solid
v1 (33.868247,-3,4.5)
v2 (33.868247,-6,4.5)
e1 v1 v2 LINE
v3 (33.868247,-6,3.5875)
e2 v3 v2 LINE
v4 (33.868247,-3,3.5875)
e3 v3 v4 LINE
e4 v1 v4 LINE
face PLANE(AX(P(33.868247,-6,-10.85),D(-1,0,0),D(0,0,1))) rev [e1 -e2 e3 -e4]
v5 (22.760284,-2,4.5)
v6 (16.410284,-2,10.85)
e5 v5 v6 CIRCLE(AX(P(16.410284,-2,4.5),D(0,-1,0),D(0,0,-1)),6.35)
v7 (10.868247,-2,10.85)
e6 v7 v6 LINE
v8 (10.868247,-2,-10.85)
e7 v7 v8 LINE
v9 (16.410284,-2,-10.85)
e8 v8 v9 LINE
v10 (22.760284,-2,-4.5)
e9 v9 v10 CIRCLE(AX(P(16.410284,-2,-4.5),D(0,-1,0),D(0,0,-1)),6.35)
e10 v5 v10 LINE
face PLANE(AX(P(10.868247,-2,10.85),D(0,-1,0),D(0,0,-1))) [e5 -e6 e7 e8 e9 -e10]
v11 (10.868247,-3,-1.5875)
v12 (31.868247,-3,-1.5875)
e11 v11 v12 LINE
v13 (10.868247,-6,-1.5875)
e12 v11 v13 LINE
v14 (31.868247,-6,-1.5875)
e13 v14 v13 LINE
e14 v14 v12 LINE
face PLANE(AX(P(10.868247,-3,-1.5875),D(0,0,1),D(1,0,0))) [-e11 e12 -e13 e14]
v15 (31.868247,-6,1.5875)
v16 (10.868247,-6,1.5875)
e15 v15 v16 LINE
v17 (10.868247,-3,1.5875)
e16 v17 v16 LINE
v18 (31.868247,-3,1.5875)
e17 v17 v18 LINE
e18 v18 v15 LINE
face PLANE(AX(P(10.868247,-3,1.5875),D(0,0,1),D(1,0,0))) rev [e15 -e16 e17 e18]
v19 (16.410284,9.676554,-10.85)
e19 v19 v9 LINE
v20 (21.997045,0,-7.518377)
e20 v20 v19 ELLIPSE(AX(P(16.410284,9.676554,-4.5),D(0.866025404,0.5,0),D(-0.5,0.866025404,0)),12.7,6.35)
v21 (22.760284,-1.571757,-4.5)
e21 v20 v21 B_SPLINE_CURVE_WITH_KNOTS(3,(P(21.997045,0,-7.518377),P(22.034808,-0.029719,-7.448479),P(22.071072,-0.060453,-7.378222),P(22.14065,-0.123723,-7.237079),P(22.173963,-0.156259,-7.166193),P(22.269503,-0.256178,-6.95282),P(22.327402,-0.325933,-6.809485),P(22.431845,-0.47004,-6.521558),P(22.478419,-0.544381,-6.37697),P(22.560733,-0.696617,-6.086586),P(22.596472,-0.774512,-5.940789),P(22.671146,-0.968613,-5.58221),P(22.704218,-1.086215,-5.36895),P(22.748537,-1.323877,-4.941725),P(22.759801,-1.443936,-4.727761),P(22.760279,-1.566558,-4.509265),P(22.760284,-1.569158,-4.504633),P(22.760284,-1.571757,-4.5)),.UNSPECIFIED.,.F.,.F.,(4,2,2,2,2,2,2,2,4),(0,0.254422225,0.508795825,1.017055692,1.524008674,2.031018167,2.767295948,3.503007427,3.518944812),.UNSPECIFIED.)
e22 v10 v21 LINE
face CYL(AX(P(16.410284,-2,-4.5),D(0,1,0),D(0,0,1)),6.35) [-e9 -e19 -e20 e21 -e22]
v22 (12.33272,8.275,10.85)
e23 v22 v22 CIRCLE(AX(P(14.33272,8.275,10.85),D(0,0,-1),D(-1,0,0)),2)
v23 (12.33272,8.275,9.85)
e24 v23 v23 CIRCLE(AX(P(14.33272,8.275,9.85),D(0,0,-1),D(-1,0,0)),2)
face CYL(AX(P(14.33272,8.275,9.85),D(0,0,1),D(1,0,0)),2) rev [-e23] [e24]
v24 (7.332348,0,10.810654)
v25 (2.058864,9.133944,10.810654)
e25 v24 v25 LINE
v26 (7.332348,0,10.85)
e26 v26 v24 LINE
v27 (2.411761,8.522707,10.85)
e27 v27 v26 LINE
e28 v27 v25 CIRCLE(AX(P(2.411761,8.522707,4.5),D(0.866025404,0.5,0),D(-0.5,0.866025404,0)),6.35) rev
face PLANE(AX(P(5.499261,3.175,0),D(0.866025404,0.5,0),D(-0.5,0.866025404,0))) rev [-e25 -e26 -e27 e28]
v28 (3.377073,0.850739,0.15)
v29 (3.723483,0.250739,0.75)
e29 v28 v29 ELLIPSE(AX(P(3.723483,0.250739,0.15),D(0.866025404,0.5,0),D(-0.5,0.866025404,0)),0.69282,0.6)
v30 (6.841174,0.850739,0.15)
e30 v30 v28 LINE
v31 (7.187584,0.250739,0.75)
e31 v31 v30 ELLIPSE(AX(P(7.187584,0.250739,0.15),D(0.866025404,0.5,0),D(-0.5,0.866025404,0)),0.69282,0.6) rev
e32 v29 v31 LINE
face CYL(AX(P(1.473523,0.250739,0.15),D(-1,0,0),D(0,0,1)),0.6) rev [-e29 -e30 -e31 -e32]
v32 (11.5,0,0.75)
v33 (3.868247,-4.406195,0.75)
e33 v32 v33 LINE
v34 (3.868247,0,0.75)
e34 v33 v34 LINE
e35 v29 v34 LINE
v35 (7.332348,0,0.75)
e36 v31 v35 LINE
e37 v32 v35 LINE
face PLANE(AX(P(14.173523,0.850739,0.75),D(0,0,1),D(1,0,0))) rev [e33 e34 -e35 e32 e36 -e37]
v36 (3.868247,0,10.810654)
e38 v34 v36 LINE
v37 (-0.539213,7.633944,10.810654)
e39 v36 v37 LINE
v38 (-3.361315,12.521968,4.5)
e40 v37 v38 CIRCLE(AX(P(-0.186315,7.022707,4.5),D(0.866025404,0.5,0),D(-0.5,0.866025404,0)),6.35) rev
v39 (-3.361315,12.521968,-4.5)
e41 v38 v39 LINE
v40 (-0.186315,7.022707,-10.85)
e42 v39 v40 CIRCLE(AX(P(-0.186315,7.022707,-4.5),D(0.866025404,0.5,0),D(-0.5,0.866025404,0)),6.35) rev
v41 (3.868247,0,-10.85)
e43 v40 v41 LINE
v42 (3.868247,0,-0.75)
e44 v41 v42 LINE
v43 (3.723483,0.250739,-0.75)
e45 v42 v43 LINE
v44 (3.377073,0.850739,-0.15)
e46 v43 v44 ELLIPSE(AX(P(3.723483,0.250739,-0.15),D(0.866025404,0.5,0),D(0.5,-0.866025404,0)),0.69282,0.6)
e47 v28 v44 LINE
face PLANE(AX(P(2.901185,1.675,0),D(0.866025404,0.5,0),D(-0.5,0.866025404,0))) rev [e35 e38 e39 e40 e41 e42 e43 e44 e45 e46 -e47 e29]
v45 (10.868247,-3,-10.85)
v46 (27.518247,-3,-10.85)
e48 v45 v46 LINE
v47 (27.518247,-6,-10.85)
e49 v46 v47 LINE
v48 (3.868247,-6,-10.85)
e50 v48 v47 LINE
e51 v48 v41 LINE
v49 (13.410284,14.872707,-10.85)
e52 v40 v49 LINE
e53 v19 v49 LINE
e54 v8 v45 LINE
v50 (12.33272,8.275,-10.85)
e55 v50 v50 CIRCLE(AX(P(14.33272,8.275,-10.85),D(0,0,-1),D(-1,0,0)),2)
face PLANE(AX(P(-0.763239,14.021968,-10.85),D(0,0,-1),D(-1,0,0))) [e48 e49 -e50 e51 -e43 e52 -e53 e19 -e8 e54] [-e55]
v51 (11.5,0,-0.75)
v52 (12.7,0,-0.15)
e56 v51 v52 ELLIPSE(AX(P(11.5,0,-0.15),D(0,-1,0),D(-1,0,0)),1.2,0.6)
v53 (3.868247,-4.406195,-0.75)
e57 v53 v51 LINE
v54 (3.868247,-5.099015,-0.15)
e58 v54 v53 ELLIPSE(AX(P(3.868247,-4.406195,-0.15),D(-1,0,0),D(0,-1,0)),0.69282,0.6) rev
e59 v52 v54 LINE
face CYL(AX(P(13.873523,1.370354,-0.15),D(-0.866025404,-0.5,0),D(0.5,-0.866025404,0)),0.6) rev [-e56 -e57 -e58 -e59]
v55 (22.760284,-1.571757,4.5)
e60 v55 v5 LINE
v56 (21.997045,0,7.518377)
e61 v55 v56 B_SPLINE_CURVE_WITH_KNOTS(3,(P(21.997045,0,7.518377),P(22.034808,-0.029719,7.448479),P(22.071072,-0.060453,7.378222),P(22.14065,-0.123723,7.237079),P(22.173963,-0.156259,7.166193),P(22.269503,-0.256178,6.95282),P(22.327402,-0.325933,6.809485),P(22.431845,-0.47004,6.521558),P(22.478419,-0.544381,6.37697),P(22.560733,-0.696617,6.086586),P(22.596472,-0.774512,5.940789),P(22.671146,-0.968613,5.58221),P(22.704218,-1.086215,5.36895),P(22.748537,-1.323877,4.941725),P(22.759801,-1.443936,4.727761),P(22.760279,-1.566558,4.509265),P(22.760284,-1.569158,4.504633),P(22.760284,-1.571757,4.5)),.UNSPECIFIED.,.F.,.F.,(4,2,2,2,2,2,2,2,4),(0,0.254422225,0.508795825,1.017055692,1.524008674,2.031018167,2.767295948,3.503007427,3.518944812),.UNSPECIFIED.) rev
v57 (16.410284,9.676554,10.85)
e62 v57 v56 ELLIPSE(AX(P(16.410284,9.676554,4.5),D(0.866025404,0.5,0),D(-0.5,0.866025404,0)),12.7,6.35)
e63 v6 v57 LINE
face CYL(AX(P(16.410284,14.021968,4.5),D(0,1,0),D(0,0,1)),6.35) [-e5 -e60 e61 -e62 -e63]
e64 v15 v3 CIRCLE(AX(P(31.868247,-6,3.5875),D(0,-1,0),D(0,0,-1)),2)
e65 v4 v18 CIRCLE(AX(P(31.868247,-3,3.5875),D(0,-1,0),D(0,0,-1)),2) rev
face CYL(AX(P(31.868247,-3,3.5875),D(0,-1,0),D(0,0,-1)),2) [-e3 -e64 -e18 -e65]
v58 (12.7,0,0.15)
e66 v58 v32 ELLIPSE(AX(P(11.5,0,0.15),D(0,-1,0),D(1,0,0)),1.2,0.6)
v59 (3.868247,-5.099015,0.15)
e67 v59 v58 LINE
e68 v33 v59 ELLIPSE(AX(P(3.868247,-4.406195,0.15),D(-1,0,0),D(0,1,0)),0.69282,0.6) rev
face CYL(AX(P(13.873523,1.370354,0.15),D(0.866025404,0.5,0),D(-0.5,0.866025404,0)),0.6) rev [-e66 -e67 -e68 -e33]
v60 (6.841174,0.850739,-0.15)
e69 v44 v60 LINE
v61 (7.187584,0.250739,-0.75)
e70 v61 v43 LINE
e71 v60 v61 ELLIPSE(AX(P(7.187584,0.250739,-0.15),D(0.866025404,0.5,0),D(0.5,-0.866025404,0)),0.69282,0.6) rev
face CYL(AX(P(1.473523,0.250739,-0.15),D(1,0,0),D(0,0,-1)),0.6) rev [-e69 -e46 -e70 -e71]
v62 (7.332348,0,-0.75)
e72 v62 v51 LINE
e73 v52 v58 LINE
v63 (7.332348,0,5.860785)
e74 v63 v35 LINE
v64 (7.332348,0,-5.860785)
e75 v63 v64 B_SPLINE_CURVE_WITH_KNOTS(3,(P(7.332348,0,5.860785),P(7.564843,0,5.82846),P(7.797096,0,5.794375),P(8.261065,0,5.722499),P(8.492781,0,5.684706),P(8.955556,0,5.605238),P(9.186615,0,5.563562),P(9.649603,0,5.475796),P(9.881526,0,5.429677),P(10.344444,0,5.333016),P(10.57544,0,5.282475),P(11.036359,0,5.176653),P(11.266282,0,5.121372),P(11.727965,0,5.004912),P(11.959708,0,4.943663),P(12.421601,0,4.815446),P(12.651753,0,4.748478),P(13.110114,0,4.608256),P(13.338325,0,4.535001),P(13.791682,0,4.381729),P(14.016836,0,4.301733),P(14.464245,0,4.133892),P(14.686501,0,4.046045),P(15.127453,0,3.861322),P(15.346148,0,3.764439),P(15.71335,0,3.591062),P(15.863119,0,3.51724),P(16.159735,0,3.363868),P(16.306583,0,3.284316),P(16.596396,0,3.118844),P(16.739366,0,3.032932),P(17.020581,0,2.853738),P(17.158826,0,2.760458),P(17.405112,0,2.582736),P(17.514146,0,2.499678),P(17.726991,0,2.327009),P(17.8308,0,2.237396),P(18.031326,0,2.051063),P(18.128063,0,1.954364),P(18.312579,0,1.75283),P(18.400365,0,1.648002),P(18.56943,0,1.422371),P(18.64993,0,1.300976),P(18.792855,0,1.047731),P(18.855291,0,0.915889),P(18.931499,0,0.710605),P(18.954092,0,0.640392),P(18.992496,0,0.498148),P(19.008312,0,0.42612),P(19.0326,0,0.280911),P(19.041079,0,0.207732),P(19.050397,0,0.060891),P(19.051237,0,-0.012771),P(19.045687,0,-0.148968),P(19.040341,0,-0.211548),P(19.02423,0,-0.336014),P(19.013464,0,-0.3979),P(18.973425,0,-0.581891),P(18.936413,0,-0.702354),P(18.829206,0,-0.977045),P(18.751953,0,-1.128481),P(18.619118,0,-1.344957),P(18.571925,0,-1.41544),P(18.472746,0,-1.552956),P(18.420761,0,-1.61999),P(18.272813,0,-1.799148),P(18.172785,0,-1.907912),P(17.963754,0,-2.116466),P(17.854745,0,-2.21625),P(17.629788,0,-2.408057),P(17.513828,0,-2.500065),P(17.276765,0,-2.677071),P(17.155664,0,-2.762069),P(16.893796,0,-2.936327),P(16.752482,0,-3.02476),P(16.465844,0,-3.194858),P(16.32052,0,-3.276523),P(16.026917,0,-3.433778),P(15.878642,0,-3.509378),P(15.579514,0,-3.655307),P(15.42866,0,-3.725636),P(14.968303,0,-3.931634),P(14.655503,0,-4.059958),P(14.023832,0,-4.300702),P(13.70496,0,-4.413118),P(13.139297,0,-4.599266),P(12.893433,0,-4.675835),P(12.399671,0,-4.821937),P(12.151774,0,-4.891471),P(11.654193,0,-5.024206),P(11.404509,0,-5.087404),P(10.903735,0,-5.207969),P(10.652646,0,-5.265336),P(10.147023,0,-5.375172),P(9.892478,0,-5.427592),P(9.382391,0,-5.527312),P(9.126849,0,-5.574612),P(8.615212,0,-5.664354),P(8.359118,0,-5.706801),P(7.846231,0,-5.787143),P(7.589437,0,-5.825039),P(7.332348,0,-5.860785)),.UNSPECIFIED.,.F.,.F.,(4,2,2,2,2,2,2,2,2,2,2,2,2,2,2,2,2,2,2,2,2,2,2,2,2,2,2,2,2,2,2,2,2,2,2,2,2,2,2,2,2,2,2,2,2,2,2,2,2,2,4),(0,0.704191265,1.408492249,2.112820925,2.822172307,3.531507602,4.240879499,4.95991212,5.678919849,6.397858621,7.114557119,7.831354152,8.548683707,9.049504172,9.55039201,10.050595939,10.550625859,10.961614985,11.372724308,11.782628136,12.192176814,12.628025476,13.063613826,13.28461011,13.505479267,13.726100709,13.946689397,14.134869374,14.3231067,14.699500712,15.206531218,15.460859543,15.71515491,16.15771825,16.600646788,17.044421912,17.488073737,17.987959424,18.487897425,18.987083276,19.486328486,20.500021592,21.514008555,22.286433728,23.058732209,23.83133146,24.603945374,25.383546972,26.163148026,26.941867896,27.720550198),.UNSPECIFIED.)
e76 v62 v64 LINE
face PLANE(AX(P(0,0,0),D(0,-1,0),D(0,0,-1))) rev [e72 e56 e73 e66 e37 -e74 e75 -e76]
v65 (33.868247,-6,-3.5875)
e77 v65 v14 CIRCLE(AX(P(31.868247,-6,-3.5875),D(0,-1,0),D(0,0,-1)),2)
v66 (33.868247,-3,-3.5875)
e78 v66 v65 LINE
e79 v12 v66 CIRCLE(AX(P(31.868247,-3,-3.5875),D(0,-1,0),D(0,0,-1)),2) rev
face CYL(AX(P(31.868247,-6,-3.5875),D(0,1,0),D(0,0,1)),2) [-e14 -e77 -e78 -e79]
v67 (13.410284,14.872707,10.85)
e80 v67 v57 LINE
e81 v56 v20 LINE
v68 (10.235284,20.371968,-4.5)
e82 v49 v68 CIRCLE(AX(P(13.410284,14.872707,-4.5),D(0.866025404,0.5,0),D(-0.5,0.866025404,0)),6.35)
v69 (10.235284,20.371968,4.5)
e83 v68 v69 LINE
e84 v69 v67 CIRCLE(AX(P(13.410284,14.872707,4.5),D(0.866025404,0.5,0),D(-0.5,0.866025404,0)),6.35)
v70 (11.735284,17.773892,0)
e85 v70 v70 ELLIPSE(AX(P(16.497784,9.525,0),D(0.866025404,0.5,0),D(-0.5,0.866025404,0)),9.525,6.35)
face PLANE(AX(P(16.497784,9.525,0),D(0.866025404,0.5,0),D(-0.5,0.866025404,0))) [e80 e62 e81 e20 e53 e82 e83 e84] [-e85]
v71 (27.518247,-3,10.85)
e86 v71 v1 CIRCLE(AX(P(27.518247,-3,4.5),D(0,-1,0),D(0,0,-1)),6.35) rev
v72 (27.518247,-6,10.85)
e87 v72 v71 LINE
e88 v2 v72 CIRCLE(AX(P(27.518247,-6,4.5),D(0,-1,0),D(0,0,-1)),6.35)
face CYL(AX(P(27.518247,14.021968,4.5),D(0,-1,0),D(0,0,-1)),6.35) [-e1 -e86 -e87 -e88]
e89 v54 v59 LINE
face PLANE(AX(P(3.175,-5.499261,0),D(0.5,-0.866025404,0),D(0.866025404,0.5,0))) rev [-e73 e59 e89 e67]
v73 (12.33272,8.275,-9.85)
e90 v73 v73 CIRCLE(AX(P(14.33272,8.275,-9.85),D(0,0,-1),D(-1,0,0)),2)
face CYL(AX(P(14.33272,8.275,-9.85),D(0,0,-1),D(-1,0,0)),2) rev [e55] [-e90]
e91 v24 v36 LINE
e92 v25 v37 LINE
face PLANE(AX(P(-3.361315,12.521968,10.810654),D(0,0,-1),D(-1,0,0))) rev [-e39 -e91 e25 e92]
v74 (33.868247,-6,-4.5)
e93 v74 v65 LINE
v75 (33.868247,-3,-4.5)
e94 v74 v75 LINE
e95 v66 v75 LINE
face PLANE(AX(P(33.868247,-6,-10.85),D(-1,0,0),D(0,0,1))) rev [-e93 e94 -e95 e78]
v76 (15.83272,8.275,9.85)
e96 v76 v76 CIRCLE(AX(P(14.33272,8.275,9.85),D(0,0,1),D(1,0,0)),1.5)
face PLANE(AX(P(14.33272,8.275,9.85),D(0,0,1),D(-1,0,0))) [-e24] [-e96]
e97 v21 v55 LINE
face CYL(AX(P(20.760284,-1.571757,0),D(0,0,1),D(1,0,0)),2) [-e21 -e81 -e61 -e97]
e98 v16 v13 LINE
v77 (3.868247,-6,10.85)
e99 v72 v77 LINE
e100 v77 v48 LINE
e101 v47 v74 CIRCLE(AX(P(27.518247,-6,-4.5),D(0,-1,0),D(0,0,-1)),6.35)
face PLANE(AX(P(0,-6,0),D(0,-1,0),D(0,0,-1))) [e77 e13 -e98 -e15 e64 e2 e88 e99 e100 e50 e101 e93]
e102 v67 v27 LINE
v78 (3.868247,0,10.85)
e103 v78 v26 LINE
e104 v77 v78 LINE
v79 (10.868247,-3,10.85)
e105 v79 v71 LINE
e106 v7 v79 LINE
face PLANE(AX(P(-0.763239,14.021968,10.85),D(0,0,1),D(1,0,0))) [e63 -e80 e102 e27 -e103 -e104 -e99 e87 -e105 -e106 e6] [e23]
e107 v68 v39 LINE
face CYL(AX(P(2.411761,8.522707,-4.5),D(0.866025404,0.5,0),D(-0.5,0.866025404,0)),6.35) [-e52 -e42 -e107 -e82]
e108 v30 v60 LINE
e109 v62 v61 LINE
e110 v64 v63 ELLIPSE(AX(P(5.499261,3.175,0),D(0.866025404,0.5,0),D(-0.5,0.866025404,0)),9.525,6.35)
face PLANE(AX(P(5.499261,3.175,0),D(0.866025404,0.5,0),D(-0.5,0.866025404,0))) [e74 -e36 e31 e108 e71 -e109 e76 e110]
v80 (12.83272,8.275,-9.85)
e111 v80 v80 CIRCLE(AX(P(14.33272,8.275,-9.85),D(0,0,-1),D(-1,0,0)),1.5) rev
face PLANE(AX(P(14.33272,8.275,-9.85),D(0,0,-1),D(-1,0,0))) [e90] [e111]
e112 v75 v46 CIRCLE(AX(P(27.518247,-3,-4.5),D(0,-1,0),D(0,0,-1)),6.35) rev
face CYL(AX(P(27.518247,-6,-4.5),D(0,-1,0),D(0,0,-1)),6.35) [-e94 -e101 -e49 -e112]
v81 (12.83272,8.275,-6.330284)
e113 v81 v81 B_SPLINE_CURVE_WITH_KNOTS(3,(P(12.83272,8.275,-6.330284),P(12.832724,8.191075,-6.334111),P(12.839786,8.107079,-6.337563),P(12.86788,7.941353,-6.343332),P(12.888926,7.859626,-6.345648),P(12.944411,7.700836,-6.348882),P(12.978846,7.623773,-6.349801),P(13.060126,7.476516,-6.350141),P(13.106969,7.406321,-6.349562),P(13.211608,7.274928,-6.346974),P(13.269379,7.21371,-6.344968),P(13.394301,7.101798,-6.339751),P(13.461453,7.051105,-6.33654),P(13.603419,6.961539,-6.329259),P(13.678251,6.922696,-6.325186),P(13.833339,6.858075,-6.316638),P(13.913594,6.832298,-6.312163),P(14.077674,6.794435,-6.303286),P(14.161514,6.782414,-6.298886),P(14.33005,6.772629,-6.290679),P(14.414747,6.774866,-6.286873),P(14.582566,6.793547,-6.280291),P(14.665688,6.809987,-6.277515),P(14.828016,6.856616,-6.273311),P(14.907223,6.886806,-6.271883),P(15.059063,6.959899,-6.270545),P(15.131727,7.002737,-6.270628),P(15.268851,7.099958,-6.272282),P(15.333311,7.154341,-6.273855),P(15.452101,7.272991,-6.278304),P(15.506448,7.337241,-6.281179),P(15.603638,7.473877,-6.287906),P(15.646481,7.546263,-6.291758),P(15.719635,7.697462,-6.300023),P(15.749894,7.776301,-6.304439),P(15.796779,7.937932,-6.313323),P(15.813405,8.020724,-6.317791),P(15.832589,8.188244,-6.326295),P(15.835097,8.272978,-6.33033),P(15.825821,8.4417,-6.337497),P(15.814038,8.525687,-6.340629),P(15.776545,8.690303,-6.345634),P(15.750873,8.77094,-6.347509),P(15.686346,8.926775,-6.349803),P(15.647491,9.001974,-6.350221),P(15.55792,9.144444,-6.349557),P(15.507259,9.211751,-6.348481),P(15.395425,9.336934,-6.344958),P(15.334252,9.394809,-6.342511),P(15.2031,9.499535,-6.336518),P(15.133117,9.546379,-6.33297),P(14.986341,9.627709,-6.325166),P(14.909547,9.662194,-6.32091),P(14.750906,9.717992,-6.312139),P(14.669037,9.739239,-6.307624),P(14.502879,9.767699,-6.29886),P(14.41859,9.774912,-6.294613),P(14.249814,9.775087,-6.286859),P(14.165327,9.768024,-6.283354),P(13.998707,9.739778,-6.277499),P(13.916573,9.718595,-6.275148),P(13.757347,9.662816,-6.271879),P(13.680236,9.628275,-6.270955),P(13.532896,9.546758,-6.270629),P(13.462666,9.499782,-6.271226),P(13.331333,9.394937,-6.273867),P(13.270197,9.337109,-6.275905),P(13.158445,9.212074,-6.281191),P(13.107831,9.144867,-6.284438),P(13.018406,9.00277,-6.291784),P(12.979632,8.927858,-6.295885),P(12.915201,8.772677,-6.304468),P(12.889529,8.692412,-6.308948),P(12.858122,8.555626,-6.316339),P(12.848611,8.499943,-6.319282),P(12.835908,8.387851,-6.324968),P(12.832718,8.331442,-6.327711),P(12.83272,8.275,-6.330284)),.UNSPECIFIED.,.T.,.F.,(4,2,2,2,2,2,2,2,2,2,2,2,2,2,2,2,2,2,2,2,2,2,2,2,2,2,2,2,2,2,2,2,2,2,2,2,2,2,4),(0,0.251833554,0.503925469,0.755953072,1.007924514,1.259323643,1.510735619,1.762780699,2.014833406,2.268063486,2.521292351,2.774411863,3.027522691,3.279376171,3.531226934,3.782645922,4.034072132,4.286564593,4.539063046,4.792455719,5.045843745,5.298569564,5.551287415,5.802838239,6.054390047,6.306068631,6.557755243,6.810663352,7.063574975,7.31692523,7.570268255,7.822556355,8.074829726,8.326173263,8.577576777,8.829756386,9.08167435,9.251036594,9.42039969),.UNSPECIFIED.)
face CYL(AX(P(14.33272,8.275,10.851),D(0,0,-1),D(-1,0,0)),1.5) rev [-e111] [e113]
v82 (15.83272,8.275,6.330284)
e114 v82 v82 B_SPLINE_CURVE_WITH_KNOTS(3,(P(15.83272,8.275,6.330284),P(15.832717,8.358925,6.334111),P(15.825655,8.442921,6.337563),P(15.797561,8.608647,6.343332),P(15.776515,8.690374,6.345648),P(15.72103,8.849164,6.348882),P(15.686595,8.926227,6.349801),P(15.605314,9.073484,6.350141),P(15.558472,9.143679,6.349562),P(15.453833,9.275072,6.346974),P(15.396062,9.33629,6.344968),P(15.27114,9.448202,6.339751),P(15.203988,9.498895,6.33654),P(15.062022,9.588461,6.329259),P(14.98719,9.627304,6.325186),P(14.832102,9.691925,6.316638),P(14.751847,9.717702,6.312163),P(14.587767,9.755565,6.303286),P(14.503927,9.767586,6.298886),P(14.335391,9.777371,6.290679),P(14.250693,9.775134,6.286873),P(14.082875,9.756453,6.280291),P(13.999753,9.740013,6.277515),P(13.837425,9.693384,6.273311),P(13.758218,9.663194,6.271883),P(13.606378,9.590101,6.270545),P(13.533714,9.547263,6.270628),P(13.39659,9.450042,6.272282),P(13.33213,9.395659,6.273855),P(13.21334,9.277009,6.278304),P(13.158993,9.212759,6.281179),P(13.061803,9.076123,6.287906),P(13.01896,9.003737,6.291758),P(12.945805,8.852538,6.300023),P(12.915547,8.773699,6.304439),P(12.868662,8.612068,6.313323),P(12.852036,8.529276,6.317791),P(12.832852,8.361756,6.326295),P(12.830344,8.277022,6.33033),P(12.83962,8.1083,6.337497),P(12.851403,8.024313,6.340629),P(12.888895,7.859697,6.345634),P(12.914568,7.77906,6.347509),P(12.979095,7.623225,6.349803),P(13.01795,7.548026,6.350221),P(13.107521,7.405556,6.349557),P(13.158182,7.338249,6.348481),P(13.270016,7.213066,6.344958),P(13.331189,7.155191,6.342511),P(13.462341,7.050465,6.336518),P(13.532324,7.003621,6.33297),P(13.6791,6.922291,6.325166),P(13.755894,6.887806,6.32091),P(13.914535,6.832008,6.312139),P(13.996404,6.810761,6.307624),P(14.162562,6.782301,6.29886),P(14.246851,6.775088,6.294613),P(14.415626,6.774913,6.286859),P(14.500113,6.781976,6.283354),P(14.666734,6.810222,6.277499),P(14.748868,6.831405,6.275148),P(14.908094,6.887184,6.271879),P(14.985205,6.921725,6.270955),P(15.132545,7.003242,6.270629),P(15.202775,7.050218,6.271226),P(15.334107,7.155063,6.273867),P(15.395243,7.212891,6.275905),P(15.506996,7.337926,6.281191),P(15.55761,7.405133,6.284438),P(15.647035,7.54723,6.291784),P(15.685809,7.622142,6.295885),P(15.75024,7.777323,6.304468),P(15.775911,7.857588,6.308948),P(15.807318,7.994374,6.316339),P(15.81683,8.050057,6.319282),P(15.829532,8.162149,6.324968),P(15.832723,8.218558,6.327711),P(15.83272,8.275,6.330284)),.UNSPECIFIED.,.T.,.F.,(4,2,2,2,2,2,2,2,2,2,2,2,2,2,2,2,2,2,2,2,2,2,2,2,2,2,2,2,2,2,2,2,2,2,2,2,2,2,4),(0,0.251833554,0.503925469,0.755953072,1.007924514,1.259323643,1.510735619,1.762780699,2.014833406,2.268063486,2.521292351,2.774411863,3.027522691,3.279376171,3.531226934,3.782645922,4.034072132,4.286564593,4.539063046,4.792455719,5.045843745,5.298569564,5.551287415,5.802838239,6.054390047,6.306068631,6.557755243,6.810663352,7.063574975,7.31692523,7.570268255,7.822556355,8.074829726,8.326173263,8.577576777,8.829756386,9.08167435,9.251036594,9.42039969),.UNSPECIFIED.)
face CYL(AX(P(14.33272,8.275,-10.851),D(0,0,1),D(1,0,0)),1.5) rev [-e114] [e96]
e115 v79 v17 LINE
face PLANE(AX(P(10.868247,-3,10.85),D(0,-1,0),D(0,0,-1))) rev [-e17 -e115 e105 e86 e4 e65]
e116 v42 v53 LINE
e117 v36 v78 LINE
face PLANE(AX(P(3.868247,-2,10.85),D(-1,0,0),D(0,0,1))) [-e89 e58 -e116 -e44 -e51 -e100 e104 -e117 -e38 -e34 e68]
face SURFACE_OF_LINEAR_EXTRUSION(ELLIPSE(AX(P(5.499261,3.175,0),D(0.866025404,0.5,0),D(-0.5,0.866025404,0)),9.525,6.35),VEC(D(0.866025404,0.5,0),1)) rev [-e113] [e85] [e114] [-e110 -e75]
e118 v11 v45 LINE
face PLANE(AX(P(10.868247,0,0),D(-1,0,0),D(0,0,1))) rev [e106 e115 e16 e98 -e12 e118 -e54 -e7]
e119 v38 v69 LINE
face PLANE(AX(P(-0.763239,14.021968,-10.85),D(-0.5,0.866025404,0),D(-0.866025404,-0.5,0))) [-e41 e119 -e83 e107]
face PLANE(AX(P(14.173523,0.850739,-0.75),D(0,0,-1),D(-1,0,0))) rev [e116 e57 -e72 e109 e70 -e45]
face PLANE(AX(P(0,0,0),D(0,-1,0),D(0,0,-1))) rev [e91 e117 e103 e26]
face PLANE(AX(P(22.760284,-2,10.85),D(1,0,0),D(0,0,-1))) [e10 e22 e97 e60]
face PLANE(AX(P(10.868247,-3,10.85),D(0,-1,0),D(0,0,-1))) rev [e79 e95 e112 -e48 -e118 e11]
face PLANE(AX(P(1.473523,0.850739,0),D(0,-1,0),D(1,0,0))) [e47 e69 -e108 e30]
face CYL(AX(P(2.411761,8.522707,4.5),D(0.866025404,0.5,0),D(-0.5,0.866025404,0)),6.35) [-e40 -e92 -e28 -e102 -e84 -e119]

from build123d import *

# Parameters (mm, degrees)
SKETCH2_W           = 21.7
SKETCH2_H           = 25.05
SKETCH2_RX          = 9.525
SKETCH2_RY          = 6.35
BOSS_EXTRUDE1_DEPTH = 12.7
SKETCH3_W           = 21.660653916
SKETCH3_H           = 25.05
BOSS_EXTRUDE2_DEPTH = 3
SKETCH5_W           = 18.892037138
SKETCH5_H           = 21.7
BOSS_EXTRUDE3_DEPTH = 2
SKETCH6_W           = 30
SKETCH6_H           = 21.7
BOSS_EXTRUDE4_DEPTH = 4
SKETCH7_W           = 21.7
SKETCH7_H           = 1
SKETCH7_W_2         = 3.175
SKETCH7_H_2         = 3
CUT_EXTRUDE2_DEPTH  = 23
SKETCH7_3_W         = 21.7
SKETCH7_3_H         = 7.272473706
CUT_EXTRUDE3_DEPTH  = 44.803879418
CUT_REVOLVE1_START  = -0.75
CUT_REVOLVE1_DEPTH  = 1.5
FILLET1_R           = 0.6
CUT_EXTRUDE4_REACH  = 47.088
SKETCH9_R           = 1.5
SKETCH10_R          = 2
CUT_EXTRUDE7_DEPTH  = 1
FILLET5_R           = 6.35
FILLET6_R           = 2
FILLET7_R           = 2


# Read off the part's stored shape, not the designer's step: Cut-Revolve1
with BuildPart() as part:
    # Sketch2 → Boss-Extrude1 (new body)
    with BuildSketch(Plane(origin=(16.497783942, 9.525, 0), x_dir=(0, 0, -1), z_dir=(0.8660254037844379, 0.5000000000000013, 0))):
        Rectangle(SKETCH2_W, SKETCH2_H)
        with Locations(Location((0, 0), (0, 0, 90))):
            Ellipse(SKETCH2_RX, SKETCH2_RY, mode=Mode.SUBTRACT)
    extrude(amount=-BOSS_EXTRUDE1_DEPTH)

    # Sketch3 → Boss-Extrude2 (add)
    with BuildSketch(Plane(origin=(5.499261314, 3.175, 0), x_dir=(0, 0, 1), z_dir=(-0.8660254037844379, -0.5000000000000014, 0))):
        with Locations((-0.019673042, 0)):
            Rectangle(SKETCH3_W, SKETCH3_H)
    extrude(amount=BOSS_EXTRUDE2_DEPTH)

    # Sketch5 → Boss-Extrude3 (add)
    with BuildSketch(Plane(origin=(0, 0, 0), x_dir=(-1, 0, 0), z_dir=(0, 1, 0))):
        with Locations((-13.314265373, 0)):
            Rectangle(SKETCH5_W, SKETCH5_H)
    extrude(amount=-BOSS_EXTRUDE3_DEPTH)

    # Sketch6 → Boss-Extrude4 (add)
    with BuildSketch(Plane.XZ.offset(2)):
        with Locations((18.868246804, 0)):
            Rectangle(SKETCH6_W, SKETCH6_H)
    extrude(amount=BOSS_EXTRUDE4_DEPTH)

    # Sketch7 → Cut-Extrude2 (cut)
    with BuildSketch(Plane(origin=(33.868246804, 0, 0), x_dir=(0, 0, -1), z_dir=(1, 0, 0))):
        with Locations((0, -2.5)):
            Rectangle(SKETCH7_W, SKETCH7_H)
        with Locations((0, -4.5)):
            Rectangle(SKETCH7_W_2, SKETCH7_H_2)
    extrude(amount=-CUT_EXTRUDE2_DEPTH, mode=Mode.SUBTRACT)

    # Sketch7<3> → Cut-Extrude3 (cut, through all)
    with BuildSketch(Plane(origin=(33.868246804, 0, 0), x_dir=(0, 0, -1), z_dir=(1, 0, 0))):
        with Locations((0, -9.636236853)):
            Rectangle(SKETCH7_3_W, SKETCH7_3_H)
    extrude(amount=-CUT_EXTRUDE3_DEPTH, mode=Mode.SUBTRACT)

    # Cut-Revolve1 outline → Cut-Revolve1 (cut)
    with BuildSketch(Plane.XY.offset(CUT_REVOLVE1_START)):
        Polygon((6.841174209, 0.850738686), (3.377072594, 0.850738686), (3.868246804, 0), (3.868246804, -5.099015085), (12.7, 0), (7.332348419, 0), align=None)
    extrude(amount=CUT_REVOLVE1_DEPTH, mode=Mode.SUBTRACT)

    # Fillet1
    fillet1_edges = [part.edges().sort_by_distance(p)[0] for p in [
        (5.109123401, 0.850738686, 0.75),
        (5.109123401, 0.850738686, -0.75),
        (8.284123402, -2.549507542, -0.75),
        (8.284123402, -2.549507542, 0.75),
    ]]
    fillet(fillet1_edges, radius=FILLET1_R)

    # Sketch9 → Cut-Extrude4 (cut, up to next)
    with BuildSketch(Plane(origin=(0, 0, -10.85), x_dir=(-1, 0, 0), z_dir=(0, 0, -1)), mode=Mode.PRIVATE) as cut_extrude4_sk1:
        with Locations((-14.332720433, 8.275)):
            Circle(SKETCH9_R)
    cut_extrude4_tool1 = extrude(cut_extrude4_sk1.sketch, amount=-CUT_EXTRUDE4_REACH, mode=Mode.PRIVATE) & part.part
    cut_extrude4 = cut_extrude4_tool1.solids().sort_by_distance((14.33272, 8.275, -10.85))[0]
    add(cut_extrude4, mode=Mode.SUBTRACT)

    # Sketch10 → Cut-Extrude7 (cut)
    with BuildSketch(Plane(origin=(0, 0, -10.85), x_dir=(-1, 0, 0), z_dir=(0, 0, -1))):
        with Locations((-14.332720433, 8.275)):
            Circle(SKETCH10_R)
    cut_extrude7 = extrude(amount=-CUT_EXTRUDE7_DEPTH, mode=Mode.SUBTRACT)

    # Mirror1: Cut-Extrude4, Cut-Extrude7 across plane
    add(cut_extrude4.mirror(Plane.XY), mode=Mode.SUBTRACT)
    add(cut_extrude7.mirror(Plane.XY), mode=Mode.SUBTRACT)

    # Fillet5
    fillet5_edges = [part.edges().sort_by_distance(p)[0] for p in [
        (33.868246804, -4.5, 10.85),
        (33.868246804, -4.5, -10.85),
        (22.760283942, -1, -10.85),
        (22.760283942, -1, 10.85),
        (4.736022628, 17.196968182, 10.85),
        (3.436984522, 16.446968182, -10.85),
    ]]
    fillet(fillet5_edges, radius=FILLET5_R)

    # Fillet6
    fillet6_edges = [part.edges().sort_by_distance(p)[0] for p in [
        (33.868246804, -4.5, 1.5875),
        (33.868246804, -4.5, -1.5875),
    ]]
    fillet(fillet6_edges, radius=FILLET6_R)

    # Fillet7
    # the kernel refuses this fillet: 2 mm, written as the material it takes off along each edge
    with BuildSketch(Plane(origin=(22.760283942, 0, 8.429393602), x_dir=(-1, 0, 0), z_dir=(0, 0, -1))) as fillet7_piece_1:
        with BuildLine():
            CenterArc((2, -1.571757441), FILLET7_R, 128.197977663, 51.802022337)
            Line((0, -1.571757441), (-0.04, -1.571757441))
            Line((-0.04, -1.571757441), (-0.04, 0))
            Line((-0.04, 0), (0, 0.04))
            ThreePointArc((0, 0.04), (0.381619343, 0.04), (0.73850346, 0.031435149))
            Line((0.73850346, 0.031435149), (0.763238686, 0))
        make_face()
    extrude(amount=16.858787203, mode=Mode.SUBTRACT)


solid = part.part
